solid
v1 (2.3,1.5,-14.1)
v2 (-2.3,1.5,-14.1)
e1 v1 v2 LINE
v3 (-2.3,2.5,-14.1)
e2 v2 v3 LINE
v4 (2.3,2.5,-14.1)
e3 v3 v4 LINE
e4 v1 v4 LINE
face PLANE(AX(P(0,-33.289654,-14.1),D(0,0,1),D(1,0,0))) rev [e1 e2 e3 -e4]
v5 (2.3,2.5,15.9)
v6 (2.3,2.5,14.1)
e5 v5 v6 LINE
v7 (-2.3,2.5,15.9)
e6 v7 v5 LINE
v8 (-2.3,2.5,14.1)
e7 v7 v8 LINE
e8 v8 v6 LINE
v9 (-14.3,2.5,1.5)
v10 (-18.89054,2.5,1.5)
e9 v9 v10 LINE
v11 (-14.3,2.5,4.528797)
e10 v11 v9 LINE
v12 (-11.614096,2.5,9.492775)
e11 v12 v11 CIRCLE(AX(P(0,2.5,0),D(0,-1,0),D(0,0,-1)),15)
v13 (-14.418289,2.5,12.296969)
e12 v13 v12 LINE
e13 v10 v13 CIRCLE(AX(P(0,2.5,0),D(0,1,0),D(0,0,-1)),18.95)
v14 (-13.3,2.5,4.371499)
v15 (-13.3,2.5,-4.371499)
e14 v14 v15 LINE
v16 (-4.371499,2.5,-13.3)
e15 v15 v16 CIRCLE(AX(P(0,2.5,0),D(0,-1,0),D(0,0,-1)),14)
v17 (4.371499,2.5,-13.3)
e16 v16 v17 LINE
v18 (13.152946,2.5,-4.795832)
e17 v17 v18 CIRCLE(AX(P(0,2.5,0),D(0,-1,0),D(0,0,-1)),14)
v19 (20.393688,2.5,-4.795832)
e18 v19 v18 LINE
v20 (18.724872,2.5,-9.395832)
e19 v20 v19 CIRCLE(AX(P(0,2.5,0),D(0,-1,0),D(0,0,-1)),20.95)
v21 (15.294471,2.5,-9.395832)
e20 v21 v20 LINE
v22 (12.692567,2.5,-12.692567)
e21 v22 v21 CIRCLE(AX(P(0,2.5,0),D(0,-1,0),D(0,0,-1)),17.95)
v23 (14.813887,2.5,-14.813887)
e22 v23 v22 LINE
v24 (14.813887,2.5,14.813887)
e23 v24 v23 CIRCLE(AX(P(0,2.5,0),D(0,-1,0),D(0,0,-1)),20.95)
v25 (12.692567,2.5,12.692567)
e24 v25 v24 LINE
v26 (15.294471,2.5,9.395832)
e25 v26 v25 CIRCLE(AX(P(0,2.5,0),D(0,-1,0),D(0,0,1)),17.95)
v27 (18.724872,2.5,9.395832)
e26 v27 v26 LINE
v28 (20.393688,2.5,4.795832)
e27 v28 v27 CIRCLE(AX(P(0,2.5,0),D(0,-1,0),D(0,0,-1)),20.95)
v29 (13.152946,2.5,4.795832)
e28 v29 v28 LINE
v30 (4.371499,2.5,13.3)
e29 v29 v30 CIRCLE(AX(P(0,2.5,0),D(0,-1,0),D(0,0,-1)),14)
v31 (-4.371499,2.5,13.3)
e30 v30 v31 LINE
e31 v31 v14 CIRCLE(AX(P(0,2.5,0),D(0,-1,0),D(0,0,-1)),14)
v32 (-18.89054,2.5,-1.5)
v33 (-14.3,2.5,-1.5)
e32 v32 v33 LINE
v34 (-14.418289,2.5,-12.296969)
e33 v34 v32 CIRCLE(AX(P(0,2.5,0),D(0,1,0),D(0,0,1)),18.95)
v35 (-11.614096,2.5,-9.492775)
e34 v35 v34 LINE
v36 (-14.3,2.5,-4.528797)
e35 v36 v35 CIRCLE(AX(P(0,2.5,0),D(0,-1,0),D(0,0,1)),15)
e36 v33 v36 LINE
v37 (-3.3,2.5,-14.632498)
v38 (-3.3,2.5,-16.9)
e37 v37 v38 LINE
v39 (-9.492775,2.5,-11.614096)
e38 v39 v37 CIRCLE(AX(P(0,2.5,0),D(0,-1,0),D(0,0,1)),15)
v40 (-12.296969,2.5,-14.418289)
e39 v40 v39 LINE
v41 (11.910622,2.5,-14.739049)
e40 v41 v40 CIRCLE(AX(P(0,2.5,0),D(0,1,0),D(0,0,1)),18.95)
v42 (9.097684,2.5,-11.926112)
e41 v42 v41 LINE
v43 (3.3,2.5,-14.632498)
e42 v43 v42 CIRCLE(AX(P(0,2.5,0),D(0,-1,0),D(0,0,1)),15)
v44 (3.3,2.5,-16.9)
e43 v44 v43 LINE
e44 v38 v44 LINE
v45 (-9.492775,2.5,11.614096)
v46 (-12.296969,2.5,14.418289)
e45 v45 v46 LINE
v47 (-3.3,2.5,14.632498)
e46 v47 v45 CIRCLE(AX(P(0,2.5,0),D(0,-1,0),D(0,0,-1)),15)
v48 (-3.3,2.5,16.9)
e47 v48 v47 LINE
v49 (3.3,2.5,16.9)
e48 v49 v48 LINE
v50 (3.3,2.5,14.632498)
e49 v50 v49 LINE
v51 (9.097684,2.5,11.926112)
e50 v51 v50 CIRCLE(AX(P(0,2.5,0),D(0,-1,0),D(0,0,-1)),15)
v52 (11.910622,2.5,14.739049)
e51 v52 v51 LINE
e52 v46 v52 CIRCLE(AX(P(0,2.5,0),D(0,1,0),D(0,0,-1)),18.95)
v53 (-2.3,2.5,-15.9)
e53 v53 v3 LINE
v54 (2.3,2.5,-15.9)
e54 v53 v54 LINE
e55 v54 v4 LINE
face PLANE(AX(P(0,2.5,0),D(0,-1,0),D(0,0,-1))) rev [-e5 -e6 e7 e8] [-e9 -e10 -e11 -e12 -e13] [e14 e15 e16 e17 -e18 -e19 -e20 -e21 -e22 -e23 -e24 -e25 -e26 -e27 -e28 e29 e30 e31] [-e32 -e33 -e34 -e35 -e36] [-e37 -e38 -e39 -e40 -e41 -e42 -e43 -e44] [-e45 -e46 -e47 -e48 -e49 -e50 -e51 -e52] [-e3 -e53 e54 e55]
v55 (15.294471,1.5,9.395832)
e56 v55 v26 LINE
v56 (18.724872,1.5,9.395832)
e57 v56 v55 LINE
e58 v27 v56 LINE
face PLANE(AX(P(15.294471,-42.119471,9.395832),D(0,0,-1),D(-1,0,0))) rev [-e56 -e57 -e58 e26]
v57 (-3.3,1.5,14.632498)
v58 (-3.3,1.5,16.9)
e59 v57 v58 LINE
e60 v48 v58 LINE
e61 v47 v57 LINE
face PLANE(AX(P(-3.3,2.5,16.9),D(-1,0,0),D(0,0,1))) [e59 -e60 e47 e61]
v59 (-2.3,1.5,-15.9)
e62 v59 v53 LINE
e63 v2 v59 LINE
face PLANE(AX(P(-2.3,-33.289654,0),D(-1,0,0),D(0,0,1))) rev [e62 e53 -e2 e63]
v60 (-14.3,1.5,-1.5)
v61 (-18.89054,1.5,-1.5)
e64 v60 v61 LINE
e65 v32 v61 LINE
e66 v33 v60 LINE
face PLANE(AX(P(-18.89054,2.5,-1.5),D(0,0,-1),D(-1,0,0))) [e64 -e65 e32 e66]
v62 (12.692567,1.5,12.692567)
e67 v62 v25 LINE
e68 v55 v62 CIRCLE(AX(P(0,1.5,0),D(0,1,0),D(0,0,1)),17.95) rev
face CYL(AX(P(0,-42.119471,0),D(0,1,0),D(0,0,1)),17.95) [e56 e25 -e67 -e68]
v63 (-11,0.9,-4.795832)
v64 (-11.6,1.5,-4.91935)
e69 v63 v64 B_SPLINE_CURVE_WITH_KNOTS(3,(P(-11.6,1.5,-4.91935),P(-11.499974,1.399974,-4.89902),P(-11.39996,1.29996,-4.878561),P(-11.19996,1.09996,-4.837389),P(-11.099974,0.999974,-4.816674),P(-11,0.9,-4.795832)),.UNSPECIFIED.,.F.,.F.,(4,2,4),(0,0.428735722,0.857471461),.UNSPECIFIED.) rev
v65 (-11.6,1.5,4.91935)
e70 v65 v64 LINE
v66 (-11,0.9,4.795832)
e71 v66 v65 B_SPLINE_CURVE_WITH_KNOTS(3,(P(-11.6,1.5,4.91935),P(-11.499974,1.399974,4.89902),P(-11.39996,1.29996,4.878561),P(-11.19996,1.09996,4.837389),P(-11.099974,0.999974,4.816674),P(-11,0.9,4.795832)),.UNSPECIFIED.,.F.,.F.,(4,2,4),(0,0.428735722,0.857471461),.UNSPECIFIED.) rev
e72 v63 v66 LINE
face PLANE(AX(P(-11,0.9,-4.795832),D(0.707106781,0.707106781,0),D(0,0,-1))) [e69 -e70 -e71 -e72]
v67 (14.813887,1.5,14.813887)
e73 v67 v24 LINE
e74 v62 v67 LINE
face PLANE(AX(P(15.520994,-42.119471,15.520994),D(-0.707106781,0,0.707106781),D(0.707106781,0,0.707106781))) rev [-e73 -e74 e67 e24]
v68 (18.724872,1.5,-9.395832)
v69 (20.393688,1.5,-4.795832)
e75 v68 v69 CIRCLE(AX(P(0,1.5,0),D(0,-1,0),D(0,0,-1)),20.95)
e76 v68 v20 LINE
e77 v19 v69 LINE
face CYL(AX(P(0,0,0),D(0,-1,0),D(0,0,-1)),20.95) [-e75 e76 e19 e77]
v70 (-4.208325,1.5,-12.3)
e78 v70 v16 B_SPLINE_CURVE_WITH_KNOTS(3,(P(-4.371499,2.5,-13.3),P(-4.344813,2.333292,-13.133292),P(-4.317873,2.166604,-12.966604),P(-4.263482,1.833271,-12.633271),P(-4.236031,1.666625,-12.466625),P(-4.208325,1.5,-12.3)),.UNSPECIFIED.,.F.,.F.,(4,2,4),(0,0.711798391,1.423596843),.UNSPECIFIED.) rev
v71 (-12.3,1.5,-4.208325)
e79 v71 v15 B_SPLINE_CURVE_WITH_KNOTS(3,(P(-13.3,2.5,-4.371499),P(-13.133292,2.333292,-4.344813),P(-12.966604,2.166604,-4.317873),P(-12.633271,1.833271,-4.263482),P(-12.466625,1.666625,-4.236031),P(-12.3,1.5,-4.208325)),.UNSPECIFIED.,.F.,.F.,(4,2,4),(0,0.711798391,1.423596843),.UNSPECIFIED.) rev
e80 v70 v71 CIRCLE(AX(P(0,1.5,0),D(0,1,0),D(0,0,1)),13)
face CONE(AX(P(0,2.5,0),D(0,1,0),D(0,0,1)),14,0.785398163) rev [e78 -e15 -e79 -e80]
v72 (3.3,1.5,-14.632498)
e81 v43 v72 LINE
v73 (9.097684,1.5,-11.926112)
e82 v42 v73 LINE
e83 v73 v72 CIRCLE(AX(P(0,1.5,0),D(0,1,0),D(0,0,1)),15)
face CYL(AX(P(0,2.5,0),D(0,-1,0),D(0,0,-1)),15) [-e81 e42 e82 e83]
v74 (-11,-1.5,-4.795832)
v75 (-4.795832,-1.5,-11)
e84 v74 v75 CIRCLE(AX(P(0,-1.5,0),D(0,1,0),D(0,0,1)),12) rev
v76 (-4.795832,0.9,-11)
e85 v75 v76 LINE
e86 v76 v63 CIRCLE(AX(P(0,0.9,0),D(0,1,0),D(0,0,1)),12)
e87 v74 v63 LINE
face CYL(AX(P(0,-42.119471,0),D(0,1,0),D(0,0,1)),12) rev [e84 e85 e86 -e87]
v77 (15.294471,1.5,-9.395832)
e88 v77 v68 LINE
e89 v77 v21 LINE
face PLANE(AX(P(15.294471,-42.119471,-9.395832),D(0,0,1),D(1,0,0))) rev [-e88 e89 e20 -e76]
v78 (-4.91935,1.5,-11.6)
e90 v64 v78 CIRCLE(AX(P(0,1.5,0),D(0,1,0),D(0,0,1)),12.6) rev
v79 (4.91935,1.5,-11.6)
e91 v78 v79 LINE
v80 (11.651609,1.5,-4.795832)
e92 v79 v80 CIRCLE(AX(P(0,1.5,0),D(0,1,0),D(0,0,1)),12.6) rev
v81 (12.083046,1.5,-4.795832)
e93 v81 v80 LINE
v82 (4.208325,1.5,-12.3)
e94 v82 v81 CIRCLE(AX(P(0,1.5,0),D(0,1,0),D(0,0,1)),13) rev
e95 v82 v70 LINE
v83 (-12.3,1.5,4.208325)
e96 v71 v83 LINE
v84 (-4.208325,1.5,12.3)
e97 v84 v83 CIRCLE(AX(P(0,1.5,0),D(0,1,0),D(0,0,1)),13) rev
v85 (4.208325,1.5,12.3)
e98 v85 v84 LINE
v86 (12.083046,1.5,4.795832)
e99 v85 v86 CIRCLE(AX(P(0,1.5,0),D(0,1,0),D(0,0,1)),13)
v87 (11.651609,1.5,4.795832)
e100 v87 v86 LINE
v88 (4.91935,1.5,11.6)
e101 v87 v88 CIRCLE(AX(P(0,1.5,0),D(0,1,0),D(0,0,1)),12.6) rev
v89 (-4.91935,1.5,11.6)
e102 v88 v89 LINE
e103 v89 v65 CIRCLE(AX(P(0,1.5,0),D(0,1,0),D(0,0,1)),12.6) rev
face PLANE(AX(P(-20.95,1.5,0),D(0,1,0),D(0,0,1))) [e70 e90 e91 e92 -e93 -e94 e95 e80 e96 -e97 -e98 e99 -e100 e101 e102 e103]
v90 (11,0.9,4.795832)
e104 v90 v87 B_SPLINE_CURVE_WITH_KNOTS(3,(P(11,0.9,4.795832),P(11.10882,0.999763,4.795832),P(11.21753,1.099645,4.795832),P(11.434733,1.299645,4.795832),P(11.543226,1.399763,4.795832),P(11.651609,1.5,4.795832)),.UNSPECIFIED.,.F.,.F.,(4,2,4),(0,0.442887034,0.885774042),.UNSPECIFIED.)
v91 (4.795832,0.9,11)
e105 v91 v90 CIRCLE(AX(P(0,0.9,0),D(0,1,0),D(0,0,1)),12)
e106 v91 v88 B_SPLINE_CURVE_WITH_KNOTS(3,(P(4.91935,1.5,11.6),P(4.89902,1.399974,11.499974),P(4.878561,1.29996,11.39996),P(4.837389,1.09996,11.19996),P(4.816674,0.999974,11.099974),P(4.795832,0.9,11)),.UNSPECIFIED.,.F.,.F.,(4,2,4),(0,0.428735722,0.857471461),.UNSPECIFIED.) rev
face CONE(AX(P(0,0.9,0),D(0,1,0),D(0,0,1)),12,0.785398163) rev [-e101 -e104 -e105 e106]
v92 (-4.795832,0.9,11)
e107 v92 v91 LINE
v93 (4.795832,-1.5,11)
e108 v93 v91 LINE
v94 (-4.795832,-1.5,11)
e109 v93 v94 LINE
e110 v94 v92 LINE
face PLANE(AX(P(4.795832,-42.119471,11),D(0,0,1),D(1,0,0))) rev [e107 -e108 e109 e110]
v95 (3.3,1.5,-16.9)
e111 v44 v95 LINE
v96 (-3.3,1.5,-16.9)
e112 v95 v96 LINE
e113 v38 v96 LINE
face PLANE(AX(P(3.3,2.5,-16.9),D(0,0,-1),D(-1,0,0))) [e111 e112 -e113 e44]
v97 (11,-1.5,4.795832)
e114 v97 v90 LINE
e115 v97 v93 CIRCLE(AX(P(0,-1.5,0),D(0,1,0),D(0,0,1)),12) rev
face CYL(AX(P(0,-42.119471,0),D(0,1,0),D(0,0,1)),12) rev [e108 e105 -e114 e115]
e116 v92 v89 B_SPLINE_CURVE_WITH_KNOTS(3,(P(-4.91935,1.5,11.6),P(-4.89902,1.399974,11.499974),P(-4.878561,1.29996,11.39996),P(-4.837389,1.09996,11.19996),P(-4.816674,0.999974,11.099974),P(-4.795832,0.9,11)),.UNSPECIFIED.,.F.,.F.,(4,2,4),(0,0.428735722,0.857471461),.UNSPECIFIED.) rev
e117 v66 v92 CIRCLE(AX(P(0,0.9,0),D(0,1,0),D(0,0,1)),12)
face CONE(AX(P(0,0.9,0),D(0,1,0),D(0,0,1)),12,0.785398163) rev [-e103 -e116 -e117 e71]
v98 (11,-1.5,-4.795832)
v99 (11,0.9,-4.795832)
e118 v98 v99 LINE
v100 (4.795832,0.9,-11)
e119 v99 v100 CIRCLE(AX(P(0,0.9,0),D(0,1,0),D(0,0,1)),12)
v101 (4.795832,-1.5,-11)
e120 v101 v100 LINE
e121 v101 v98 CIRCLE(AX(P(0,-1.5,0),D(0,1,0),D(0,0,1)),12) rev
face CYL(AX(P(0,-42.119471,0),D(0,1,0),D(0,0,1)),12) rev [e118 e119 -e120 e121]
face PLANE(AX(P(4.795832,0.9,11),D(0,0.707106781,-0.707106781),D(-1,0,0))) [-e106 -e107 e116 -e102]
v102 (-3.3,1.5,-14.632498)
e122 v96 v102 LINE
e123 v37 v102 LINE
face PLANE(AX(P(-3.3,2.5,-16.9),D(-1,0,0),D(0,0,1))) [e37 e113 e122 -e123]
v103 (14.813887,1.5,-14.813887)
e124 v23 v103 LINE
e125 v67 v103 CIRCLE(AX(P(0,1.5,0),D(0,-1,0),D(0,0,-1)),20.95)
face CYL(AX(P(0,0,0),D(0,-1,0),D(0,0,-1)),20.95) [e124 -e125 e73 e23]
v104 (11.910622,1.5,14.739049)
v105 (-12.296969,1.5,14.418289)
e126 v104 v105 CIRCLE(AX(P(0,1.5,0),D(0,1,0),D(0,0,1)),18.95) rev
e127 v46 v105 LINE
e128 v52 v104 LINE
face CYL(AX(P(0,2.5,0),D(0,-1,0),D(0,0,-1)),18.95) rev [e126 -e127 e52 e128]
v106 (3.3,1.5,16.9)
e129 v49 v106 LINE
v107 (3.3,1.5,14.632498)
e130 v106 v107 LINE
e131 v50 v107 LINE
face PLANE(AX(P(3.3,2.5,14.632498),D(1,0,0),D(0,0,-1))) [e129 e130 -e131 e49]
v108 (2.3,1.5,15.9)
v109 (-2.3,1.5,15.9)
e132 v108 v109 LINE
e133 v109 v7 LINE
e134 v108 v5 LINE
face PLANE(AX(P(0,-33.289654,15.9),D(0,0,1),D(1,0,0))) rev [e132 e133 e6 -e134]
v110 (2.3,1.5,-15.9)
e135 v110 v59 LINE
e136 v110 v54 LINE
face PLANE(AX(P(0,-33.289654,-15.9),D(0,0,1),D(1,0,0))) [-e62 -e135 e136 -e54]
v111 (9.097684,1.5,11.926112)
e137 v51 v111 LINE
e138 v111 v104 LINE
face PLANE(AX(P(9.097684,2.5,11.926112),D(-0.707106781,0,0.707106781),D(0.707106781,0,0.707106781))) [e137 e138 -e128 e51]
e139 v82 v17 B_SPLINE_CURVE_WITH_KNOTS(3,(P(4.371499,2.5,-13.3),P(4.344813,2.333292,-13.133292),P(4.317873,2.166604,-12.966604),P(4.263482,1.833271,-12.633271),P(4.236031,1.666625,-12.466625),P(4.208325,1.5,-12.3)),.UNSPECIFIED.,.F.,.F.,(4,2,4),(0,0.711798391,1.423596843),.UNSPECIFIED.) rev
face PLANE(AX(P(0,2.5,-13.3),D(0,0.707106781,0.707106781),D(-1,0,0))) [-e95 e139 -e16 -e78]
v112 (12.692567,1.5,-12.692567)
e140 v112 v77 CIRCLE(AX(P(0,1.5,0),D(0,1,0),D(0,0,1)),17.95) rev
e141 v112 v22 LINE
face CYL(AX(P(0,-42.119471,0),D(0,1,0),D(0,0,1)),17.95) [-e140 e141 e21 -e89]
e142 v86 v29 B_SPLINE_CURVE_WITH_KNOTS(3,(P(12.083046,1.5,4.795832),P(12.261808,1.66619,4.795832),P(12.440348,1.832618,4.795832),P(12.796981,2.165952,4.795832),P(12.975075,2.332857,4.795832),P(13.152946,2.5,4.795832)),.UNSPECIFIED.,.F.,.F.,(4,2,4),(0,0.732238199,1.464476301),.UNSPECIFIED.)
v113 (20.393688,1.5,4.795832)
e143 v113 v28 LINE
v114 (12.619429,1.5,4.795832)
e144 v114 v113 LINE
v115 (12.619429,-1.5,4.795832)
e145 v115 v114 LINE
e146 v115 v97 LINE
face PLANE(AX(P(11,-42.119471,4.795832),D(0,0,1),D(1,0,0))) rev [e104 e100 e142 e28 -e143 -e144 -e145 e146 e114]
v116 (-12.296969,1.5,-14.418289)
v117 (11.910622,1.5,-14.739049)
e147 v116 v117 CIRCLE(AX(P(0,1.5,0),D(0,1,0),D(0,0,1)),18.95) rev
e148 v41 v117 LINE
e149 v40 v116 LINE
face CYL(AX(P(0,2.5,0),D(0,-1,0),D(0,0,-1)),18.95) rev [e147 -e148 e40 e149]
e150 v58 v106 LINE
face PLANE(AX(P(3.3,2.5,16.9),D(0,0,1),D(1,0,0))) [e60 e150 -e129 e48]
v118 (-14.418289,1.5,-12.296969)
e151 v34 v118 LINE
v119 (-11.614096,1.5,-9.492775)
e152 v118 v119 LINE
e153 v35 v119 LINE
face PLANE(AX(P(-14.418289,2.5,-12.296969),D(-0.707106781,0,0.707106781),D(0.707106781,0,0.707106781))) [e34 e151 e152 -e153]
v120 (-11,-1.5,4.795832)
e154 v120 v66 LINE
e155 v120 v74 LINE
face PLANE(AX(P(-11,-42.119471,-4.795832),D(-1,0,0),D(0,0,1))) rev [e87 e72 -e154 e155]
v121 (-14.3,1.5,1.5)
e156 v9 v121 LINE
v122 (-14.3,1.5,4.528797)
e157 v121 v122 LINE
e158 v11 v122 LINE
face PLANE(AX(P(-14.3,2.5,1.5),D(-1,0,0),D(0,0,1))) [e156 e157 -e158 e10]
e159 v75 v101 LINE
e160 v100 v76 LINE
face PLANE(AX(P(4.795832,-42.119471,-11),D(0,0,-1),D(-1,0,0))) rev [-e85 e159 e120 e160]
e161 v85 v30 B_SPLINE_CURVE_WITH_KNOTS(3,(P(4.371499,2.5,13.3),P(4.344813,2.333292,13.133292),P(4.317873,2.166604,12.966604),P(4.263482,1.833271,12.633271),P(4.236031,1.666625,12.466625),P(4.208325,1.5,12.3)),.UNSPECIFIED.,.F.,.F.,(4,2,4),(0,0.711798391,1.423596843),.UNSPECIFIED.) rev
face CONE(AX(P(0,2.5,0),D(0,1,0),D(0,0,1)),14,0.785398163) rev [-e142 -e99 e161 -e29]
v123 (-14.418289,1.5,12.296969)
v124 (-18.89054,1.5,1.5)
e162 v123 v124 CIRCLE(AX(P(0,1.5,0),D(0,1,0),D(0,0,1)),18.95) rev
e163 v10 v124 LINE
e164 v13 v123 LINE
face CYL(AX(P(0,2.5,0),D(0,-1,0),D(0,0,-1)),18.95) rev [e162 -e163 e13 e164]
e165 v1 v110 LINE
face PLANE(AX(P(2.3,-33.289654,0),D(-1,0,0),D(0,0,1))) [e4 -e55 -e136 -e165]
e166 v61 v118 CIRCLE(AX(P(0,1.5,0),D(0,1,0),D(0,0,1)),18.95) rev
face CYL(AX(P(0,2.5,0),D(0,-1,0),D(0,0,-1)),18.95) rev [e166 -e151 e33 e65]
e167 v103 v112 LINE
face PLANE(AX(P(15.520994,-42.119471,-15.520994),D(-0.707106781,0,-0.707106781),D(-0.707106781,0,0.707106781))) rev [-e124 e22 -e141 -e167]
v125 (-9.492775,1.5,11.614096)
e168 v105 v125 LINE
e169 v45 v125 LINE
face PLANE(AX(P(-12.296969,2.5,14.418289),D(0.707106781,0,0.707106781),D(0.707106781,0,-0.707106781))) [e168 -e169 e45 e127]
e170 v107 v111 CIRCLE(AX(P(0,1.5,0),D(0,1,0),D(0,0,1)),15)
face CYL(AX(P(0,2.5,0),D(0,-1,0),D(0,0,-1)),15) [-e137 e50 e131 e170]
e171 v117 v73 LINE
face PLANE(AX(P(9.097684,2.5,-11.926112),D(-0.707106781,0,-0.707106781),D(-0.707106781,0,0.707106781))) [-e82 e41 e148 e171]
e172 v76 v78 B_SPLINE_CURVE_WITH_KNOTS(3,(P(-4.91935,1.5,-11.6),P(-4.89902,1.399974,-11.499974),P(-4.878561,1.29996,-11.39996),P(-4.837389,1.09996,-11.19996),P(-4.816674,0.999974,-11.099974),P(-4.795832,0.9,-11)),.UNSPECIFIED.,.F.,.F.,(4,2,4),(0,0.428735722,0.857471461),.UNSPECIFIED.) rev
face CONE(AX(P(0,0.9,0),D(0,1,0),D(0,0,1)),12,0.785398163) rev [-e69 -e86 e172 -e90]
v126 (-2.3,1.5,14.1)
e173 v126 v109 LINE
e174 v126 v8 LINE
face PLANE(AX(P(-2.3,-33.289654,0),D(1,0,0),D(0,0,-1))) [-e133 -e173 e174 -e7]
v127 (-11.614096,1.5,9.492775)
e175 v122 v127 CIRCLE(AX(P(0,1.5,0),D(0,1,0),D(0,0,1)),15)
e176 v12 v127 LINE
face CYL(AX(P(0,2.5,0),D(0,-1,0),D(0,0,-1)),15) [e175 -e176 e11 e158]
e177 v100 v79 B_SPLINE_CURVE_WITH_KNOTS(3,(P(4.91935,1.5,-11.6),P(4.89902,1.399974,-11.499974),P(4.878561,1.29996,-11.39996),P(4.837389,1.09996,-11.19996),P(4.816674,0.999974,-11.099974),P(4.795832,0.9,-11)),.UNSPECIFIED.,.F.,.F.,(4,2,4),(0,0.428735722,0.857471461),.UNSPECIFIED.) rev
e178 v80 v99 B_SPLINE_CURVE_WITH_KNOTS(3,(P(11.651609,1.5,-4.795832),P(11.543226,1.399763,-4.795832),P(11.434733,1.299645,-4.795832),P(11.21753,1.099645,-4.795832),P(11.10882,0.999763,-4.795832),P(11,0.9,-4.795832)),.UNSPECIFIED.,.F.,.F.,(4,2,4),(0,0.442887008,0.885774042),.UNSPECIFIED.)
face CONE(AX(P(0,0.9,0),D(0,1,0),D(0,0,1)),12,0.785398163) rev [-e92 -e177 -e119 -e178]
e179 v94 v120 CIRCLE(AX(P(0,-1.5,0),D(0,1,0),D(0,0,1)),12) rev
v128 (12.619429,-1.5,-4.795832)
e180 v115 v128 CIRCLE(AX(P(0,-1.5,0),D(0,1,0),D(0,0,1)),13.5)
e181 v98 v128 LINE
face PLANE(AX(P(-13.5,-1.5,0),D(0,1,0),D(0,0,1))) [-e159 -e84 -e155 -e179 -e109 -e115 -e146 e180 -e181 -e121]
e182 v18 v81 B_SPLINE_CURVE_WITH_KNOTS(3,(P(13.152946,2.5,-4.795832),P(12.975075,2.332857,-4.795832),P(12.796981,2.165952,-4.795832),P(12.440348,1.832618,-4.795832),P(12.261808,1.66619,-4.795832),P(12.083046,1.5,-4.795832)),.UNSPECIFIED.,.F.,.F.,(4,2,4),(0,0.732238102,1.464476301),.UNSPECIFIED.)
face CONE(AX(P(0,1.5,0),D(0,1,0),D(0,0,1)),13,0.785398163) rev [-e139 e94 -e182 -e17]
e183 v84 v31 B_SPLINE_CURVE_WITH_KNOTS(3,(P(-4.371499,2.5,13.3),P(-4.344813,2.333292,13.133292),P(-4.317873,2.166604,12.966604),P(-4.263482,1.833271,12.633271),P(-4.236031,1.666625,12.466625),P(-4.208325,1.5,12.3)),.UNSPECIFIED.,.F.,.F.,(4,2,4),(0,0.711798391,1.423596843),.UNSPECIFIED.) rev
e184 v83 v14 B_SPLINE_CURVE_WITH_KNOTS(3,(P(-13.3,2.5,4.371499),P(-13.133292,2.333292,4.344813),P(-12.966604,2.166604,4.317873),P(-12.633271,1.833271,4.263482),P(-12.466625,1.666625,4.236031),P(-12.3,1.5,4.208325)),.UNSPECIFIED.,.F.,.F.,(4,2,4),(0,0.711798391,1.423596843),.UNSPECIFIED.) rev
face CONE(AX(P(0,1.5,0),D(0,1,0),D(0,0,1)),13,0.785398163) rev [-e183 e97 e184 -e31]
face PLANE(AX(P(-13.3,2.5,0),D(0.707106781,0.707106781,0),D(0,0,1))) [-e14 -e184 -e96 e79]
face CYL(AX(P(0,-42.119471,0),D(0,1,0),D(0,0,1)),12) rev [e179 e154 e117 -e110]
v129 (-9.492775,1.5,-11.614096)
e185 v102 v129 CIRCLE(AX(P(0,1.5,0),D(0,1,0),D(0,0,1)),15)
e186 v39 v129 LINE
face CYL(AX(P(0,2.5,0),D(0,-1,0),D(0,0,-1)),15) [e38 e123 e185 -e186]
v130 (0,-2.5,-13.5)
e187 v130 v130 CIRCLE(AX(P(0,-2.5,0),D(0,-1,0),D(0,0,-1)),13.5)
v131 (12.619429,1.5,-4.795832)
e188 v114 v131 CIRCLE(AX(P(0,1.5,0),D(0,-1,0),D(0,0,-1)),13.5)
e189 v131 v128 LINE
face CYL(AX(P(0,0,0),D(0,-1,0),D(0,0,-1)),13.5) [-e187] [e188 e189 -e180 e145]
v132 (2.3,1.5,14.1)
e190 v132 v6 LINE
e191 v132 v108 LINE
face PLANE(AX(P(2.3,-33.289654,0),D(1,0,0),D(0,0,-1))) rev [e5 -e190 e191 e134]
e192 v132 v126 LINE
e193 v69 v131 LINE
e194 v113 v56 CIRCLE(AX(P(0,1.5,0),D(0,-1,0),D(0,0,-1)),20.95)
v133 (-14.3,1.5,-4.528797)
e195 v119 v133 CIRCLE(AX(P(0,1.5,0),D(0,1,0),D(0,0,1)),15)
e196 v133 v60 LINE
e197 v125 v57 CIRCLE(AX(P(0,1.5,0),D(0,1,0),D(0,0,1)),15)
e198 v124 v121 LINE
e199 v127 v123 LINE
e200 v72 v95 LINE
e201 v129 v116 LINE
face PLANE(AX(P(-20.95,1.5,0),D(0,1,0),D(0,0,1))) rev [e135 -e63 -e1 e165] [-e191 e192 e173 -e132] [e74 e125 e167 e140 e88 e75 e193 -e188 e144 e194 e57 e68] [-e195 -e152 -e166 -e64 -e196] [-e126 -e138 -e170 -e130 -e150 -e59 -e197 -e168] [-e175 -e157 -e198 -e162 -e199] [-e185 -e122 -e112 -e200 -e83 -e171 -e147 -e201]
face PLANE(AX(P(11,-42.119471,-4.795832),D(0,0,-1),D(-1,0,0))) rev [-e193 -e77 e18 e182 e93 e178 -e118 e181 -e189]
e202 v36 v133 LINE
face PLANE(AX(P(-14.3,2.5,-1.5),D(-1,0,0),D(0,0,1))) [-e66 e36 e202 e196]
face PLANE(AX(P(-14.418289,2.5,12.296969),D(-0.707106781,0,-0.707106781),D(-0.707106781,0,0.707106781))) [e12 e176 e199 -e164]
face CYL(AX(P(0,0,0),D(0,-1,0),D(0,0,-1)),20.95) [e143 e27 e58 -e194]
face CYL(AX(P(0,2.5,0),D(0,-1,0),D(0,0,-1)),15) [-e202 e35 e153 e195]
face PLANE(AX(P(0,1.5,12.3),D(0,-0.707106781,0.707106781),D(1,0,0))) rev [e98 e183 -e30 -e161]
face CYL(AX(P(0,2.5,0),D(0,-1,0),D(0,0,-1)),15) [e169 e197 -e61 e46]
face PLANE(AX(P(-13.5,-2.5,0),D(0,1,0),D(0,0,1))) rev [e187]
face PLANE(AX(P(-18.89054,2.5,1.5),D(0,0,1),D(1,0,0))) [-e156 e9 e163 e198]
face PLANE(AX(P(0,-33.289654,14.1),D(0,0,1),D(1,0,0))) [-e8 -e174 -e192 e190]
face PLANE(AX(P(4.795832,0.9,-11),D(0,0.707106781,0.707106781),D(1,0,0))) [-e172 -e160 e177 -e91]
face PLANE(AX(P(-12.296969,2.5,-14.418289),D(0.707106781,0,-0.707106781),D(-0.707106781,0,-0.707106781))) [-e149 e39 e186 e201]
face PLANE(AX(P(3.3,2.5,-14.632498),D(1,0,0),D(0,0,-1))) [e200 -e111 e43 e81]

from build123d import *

# Parameters (mm, degrees)
SKETCH2_W               = 4.6
SKETCH2_H               = 1.8
WATCH_POSITIONER_DEPTH  = 1
WATCH_HOLDER_V2_DEPTH   = 4
CHAMFER1_SIZE           = 0.6
CUT_EXTRUDE1_DEPTH      = 30.733062405
CUT_EXTRUDE1_DEPTH_BACK = 30.733062405
CHAMFER2_SIZE           = 1


with BuildPart() as part:
    # Front → Base (revolve)
    with BuildSketch(Plane.XY, mode=Mode.PRIVATE) as base_sk:
        Polygon((0, 2.5), (-20.95, 2.5), (-20.95, 1.5), (-13.5, 1.5), (-13.5, -2.5), (0, -2.5), align=None)
    revolve(base_sk.sketch.rotate(Axis((0, 0, 0), (0, 1, 0)), 270), axis=Axis((0, 0, 0), (0, 1, 0)))

    # Sketch2 → Watch Positioner (cut)
    with BuildSketch(Plane(origin=(0, 2.5, 0), x_dir=(1, 0, 0), z_dir=(0, 1, 0))):
        with BuildLine():
            Line((12.3, -4.208325083), (12.3, 4.208325083))
            ThreePointArc((12.3, 4.208325083), (9.192388155, 9.192388155), (4.208325083, 12.3))
            Line((4.208325083, 12.3), (-4.208325083, 12.3))
            ThreePointArc((-4.208325083, 12.3), (-9.192388155, 9.192388155), (-12.3, 4.208325083))
            Line((-12.3, 4.208325083), (-12.3, -4.208325083))
            ThreePointArc((-12.3, -4.208325083), (-9.192388155, -9.192388155), (-4.208325083, -12.3))
            Line((-4.208325083, -12.3), (4.208325083, -12.3))
            ThreePointArc((4.208325083, -12.3), (9.192388155, -9.192388155), (12.3, -4.208325083))
        make_face()
        with Locations((0, 15)):
            Rectangle(SKETCH2_W, SKETCH2_H)
        with Locations((0, -15)):
            Rectangle(SKETCH2_W, SKETCH2_H)
    extrude(amount=-WATCH_POSITIONER_DEPTH, mode=Mode.SUBTRACT)

    # Sketch4 → Watch Holder v2 (cut)
    with BuildSketch(Plane(origin=(0, 2.5, 0), x_dir=(1, 0, 0), z_dir=(0, 1, 0))):
        with BuildLine():
            Line((4.795831523, -11), (-4.795831523, -11))
            ThreePointArc((-4.795831523, -11), (-8.485281374, -8.485281374), (-11, -4.795831523))
            Line((-11, -4.795831523), (-11, 4.795831523))
            ThreePointArc((-11, 4.795831523), (-8.485281374, 8.485281374), (-4.795831523, 11))
            Line((-4.795831523, 11), (4.795831523, 11))
            ThreePointArc((4.795831523, 11), (8.485281374, 8.485281374), (11, 4.795831523))
            Line((11, 4.795831523), (21.95, 4.795831523))
            Line((21.95, 4.795831523), (21.95, -4.795831523))
            Line((21.95, -4.795831523), (11, -4.795831523))
            ThreePointArc((11, -4.795831523), (8.485281374, -8.485281374), (4.795831523, -11))
        make_face()
        with BuildLine():
            Line((15.294471223, 9.395831523), (19.837359955, 9.395831523))
            ThreePointArc((19.837359955, 9.395831523), (17.942483085, 12.643963015), (15.520993847, 15.520993847))
            Line((15.520993847, 15.520993847), (12.692566722, 12.692566722))
            ThreePointArc((12.692566722, 12.692566722), (14.090269301, 11.120558036), (15.294471223, 9.395831523))
        make_face()
        with BuildLine():
            Line((15.520993847, -15.520993847), (12.692566722, -12.692566722))
            ThreePointArc((12.692566722, -12.692566722), (14.090269301, -11.120558036), (15.294471223, -9.395831523))
            Line((15.294471223, -9.395831523), (19.837359955, -9.395831523))
            ThreePointArc((19.837359955, -9.395831523), (17.942483085, -12.643963015), (15.520993847, -15.520993847))
        make_face()
    extrude(amount=-WATCH_HOLDER_V2_DEPTH, mode=Mode.SUBTRACT)

    # Chamfer1
    chamfer1_edges = [part.edges().sort_by_distance(p)[0] for p in [
        (0, 1.5, 11),
        (8.485281374, 1.5, 8.485281374),
        (-8.485281374, 1.5, 8.485281374),
        (-11, 1.5, 0),
        (-8.485281374, 1.5, -8.485281374),
        (0, 1.5, -11),
        (8.485281374, 1.5, -8.485281374),
    ]]
    chamfer(chamfer1_edges, length=CHAMFER1_SIZE)

    # Sketch5 → Cut-Extrude1 (cut, two sides: drawn at the far end of the back side and taken through both)
    with BuildSketch(Plane(origin=(0, 0, 0), x_dir=(1, 0, 0), z_dir=(0, 1, 0)).offset(-CUT_EXTRUDE1_DEPTH_BACK)):
        with BuildLine():
            Line((-12.296968735, 14.418289078), (-9.492775288, 11.614095631))
            ThreePointArc((-9.492775288, 11.614095631), (-6.572021243, 13.483639597), (-3.3, 14.632498078))
            Line((-3.3, 14.632498078), (-3.3, 16.9))
            Line((-3.3, 16.9), (3.3, 16.9))
            Line((3.3, 16.9), (3.3, 14.632498078))
            ThreePointArc((3.3, 14.632498078), (6.344822846, 13.592027923), (9.097684458, 11.926111583))
            Line((9.097684458, 11.926111583), (11.910622272, 14.739049396))
            ThreePointArc((11.910622272, 14.739049396), (-0.251073083, 18.948336663), (-12.296968735, 14.418289078))
        make_face()
        with BuildLine():
            Line((-14.418289078, 12.296968735), (-11.614095631, 9.492775288))
            ThreePointArc((-11.614095631, 9.492775288), (-13.192625168, 7.138251969), (-14.3, 4.52879675))
            Line((-14.3, 4.52879675), (-14.3, 1.5))
            Line((-14.3, 1.5), (-18.890539961, 1.5))
            ThreePointArc((-18.890539961, 1.5), (-17.507517141, 7.251851043), (-14.418289078, 12.296968735))
        make_face()
        with BuildLine():
            Line((-18.890539961, -1.5), (-14.3, -1.5))
            Line((-14.3, -1.5), (-14.3, -4.52879675))
            ThreePointArc((-14.3, -4.52879675), (-13.192625168, -7.138251969), (-11.614095631, -9.492775288))
            Line((-11.614095631, -9.492775288), (-14.418289078, -12.296968735))
            ThreePointArc((-14.418289078, -12.296968735), (-17.507517141, -7.251851043), (-18.890539961, -1.5))
        make_face()
        with BuildLine():
            Line((9.097684458, -11.926111583), (11.910622272, -14.739049396))
            ThreePointArc((11.910622272, -14.739049396), (-0.251073083, -18.948336663), (-12.296968735, -14.418289078))
            Line((-12.296968735, -14.418289078), (-9.492775288, -11.614095631))
            ThreePointArc((-9.492775288, -11.614095631), (-6.572021243, -13.483639597), (-3.3, -14.632498078))
            Line((-3.3, -14.632498078), (-3.3, -16.9))
            Line((-3.3, -16.9), (3.3, -16.9))
            Line((3.3, -16.9), (3.3, -14.632498078))
            ThreePointArc((3.3, -14.632498078), (6.344822846, -13.592027923), (9.097684458, -11.926111583))
        make_face()
    extrude(amount=CUT_EXTRUDE1_DEPTH + CUT_EXTRUDE1_DEPTH_BACK, mode=Mode.SUBTRACT)

    # Chamfer2
    chamfer2_edges = [part.edges().sort_by_distance(p)[0] for p in [
        (8.968295761, 2.5, 9.411146112),
    ]]
    chamfer(chamfer2_edges, length=CHAMFER2_SIZE - 0.0001)  # a hair under: the kernel refuses the full size
    chamfer2_2_edges = [part.edges().sort_by_distance(p)[0] for p in [
        (8.968295761, 2.5, -9.411146112),
    ]]
    chamfer(chamfer2_2_edges, length=CHAMFER2_SIZE - 0.0001)  # a hair under: the kernel refuses the full size
    chamfer2_3_edges = [part.edges().sort_by_distance(p)[0] for p in [
        (-9.192388155, 2.5, 9.192388155),
    ]]
    chamfer(chamfer2_3_edges, length=CHAMFER2_SIZE - 0.0001)  # a hair under: the kernel refuses the full size
    chamfer2_4_edges = [part.edges().sort_by_distance(p)[0] for p in [
        (-9.192388155, 2.5, -9.192388155),
    ]]
    chamfer(chamfer2_4_edges, length=CHAMFER2_SIZE - 0.0001)  # a hair under: the kernel refuses the full size
    chamfer2_5_edges = [part.edges().sort_by_distance(p)[0] for p in [
        (0, 2.5, 12.3),
    ]]
    chamfer(chamfer2_5_edges, length=CHAMFER2_SIZE - 0.0001)  # a hair under: the kernel refuses the full size
    chamfer2_6_edges = [part.edges().sort_by_distance(p)[0] for p in [
        (0, 2.5, -12.3),
    ]]
    chamfer(chamfer2_6_edges, length=CHAMFER2_SIZE - 0.0001)  # a hair under: the kernel refuses the full size
    chamfer2_7_edges = [part.edges().sort_by_distance(p)[0] for p in [
        (-12.3, 2.5, 0),
    ]]
    chamfer(chamfer2_7_edges, length=CHAMFER2_SIZE - 0.0001)  # a hair under: the kernel refuses the full size


solid = part.part
